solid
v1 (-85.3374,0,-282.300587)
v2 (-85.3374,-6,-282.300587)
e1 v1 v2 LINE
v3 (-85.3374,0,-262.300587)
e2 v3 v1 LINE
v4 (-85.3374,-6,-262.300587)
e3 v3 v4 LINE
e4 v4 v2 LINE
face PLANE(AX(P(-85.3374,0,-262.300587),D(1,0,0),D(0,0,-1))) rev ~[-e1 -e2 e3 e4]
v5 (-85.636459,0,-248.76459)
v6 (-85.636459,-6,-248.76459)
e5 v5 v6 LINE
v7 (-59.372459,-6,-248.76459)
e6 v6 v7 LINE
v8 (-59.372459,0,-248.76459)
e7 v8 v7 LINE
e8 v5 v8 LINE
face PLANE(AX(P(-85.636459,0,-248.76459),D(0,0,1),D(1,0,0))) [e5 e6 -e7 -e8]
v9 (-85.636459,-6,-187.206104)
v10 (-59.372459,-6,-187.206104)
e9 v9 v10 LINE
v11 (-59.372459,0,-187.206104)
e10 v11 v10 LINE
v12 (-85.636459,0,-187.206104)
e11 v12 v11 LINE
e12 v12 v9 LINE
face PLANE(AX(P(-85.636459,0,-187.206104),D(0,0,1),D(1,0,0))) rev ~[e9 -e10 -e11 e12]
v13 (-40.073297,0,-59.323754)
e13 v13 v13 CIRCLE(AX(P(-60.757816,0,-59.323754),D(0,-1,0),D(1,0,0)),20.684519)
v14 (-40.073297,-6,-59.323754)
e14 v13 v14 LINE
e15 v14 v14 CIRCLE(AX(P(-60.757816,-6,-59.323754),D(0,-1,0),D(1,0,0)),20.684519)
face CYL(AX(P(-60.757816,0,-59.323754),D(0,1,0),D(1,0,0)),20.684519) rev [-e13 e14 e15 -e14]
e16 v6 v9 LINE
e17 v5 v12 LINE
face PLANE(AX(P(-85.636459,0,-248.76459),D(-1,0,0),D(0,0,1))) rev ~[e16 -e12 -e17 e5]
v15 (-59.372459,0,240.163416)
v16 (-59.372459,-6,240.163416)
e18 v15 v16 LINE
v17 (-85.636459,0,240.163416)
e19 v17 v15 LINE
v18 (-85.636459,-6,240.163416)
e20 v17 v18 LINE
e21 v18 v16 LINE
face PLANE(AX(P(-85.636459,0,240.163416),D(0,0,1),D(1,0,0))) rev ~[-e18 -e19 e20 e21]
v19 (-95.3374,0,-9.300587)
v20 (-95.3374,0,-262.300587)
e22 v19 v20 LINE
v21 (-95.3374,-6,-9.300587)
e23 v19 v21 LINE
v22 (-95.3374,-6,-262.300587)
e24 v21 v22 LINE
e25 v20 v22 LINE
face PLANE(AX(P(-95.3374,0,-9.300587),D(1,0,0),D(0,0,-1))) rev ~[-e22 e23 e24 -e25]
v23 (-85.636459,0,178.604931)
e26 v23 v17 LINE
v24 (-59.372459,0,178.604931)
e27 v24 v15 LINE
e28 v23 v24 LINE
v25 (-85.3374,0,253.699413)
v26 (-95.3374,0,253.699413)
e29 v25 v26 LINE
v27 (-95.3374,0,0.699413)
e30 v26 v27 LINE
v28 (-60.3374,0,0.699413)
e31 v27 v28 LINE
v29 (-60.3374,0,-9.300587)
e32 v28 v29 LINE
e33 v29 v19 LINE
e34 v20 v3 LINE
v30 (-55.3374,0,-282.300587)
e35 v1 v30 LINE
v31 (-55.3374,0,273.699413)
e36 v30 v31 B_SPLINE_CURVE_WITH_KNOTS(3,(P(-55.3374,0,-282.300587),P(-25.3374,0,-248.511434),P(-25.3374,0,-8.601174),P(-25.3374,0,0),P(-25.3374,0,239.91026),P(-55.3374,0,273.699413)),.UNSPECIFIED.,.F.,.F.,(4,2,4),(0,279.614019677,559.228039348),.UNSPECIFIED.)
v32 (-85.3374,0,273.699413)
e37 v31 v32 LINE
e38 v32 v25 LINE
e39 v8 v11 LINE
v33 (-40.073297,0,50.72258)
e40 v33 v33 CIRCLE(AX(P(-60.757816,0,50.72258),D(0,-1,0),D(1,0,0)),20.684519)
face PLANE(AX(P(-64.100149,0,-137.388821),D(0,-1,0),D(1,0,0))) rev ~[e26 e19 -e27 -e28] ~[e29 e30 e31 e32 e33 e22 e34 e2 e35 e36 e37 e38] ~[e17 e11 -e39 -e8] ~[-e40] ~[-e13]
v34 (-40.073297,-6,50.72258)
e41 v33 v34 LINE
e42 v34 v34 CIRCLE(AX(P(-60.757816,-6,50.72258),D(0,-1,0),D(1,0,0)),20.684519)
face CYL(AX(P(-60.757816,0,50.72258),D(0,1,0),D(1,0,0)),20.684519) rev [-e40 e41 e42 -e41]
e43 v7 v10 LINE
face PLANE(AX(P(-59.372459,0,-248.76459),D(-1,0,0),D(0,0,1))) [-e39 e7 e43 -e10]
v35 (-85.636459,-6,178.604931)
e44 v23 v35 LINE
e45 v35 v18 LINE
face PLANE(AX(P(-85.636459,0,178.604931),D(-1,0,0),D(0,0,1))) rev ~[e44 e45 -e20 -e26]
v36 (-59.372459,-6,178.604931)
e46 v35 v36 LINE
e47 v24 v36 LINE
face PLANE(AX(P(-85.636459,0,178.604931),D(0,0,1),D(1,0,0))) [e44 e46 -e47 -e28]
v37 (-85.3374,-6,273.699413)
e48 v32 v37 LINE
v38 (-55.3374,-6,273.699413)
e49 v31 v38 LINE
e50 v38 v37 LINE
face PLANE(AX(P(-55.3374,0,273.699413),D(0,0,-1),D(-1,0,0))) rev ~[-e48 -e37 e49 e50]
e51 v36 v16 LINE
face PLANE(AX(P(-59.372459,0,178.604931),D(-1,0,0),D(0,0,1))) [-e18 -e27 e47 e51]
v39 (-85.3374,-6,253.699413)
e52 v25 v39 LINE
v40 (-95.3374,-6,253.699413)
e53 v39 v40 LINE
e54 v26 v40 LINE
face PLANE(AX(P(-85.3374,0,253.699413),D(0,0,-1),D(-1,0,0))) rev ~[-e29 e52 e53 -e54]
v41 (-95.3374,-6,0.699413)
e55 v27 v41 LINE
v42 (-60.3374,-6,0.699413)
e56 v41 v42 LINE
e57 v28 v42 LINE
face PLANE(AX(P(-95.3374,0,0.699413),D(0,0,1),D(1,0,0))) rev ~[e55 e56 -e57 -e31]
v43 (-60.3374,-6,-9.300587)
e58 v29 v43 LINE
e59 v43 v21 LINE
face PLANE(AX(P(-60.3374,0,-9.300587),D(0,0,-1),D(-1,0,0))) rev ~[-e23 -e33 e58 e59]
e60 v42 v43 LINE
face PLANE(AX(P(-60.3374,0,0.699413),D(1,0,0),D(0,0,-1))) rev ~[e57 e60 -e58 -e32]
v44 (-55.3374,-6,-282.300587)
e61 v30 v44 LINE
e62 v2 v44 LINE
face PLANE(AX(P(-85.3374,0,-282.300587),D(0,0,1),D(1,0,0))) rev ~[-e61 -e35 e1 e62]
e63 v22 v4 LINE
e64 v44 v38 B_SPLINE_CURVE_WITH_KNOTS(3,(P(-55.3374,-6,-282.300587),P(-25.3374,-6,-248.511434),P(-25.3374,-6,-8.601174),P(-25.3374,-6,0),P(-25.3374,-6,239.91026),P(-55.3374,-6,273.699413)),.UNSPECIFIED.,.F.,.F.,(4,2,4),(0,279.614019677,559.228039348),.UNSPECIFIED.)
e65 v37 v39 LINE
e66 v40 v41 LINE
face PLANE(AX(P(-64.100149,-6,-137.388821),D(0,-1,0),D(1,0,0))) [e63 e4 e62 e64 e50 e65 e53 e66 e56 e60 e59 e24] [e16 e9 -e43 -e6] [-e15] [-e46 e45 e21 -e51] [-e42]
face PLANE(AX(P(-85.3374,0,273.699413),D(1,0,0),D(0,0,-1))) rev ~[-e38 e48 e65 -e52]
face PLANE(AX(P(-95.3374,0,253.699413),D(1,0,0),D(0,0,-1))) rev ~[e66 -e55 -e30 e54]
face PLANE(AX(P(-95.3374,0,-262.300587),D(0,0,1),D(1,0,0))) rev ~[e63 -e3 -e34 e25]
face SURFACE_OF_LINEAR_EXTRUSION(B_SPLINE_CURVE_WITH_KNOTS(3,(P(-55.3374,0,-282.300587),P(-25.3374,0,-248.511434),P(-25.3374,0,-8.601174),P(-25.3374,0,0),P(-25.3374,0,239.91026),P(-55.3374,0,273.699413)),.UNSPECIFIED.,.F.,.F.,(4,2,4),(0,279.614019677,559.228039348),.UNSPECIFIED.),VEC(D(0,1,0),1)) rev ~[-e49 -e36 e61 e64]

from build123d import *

# Parameters (mm, degrees)
F0_W     = 26.264000684
F0_H     = 61.5584850311
F0_R     = 20.6845185899
F1_DEPTH = 6


# Not quite as in the source:
# - a feature names something its author has since deleted; it is built from what else it names


with BuildPart() as f1:
    # F0 (on Front) → F1 (new body)
    with BuildSketch(Plane.XZ):
        with BuildLine():
            Line((-85.3373999149, -282.300586921), (-55.3373999149, -282.300586921))
            add(Edge.make_bspline(
                [(-55.3373999149, -282.300586921), (-25.3373999149, -248.5114336432), (-25.3373999149, -8.6011738421), (-25.3373999149, -4.300586921)],
                knots=[0, 0, 0, 0, 279.6140196771, 279.6140196771, 279.6140196771, 279.6140196771], degree=3))
            Line((-25.3373999149, -4.300586921), (-52.1773999149, -4.300586921))
            Line((-52.1773999149, -4.300586921), (-60.3373999149, -4.300586921))
            Line((-60.3373999149, -4.300586921), (-60.3373999149, -9.300586921))
            Line((-60.3373999149, -9.300586921), (-95.3373999149, -9.300586921))
            Line((-95.3373999149, -9.300586921), (-95.3373999149, -262.300586921))
            Line((-95.3373999149, -262.300586921), (-85.3373999149, -262.300586921))
            Line((-85.3373999149, -262.300586921), (-85.3373999149, -282.300586921))
        make_face()
        with Locations((-72.504458949, -217.9853469969)):
            Rectangle(F0_W, F0_H, mode=Mode.SUBTRACT)
        with Locations((-60.7578158379, -59.3237542452)):
            Circle(F0_R, mode=Mode.SUBTRACT)
        Polygon((-52.1773999149, -4.300586921), (-25.3373999149, -4.300586921), (-25.3373999149, 273.699413079), (-55.3373999149, 273.699413079), (-85.3373999149, 273.699413079), (-85.3373999149, 253.699413079), (-95.3373999149, 253.699413079), (-95.3373999149, 0.699413079), (-60.3373999149, 0.699413079), (-60.3373999149, -4.300586921), align=None)
        with Locations((-60.7578158379, 50.7225804031)):
            Circle(F0_R, mode=Mode.SUBTRACT)
        with Locations((-72.504458949, 209.3841731548)):
            Rectangle(F0_W, F0_H, mode=Mode.SUBTRACT)
        with BuildLine():
            add(Edge.make_bspline(
                [(-55.3373999149, 273.699413079), (-25.3373999149, 239.9102598011), (-25.3373999149, 0), (-25.3373999149, -4.300586921)],
                knots=[0, 0, 0, 0, 279.6140196771, 279.6140196771, 279.6140196771, 279.6140196771], degree=3))
            Line((-55.3373999149, 273.699413079), (-25.3373999149, 273.699413079))
            Line((-25.3373999149, 273.699413079), (-25.3373999149, -4.300586921))
        make_face(mode=Mode.SUBTRACT)
    extrude(amount=F1_DEPTH)


solid = f1.part
